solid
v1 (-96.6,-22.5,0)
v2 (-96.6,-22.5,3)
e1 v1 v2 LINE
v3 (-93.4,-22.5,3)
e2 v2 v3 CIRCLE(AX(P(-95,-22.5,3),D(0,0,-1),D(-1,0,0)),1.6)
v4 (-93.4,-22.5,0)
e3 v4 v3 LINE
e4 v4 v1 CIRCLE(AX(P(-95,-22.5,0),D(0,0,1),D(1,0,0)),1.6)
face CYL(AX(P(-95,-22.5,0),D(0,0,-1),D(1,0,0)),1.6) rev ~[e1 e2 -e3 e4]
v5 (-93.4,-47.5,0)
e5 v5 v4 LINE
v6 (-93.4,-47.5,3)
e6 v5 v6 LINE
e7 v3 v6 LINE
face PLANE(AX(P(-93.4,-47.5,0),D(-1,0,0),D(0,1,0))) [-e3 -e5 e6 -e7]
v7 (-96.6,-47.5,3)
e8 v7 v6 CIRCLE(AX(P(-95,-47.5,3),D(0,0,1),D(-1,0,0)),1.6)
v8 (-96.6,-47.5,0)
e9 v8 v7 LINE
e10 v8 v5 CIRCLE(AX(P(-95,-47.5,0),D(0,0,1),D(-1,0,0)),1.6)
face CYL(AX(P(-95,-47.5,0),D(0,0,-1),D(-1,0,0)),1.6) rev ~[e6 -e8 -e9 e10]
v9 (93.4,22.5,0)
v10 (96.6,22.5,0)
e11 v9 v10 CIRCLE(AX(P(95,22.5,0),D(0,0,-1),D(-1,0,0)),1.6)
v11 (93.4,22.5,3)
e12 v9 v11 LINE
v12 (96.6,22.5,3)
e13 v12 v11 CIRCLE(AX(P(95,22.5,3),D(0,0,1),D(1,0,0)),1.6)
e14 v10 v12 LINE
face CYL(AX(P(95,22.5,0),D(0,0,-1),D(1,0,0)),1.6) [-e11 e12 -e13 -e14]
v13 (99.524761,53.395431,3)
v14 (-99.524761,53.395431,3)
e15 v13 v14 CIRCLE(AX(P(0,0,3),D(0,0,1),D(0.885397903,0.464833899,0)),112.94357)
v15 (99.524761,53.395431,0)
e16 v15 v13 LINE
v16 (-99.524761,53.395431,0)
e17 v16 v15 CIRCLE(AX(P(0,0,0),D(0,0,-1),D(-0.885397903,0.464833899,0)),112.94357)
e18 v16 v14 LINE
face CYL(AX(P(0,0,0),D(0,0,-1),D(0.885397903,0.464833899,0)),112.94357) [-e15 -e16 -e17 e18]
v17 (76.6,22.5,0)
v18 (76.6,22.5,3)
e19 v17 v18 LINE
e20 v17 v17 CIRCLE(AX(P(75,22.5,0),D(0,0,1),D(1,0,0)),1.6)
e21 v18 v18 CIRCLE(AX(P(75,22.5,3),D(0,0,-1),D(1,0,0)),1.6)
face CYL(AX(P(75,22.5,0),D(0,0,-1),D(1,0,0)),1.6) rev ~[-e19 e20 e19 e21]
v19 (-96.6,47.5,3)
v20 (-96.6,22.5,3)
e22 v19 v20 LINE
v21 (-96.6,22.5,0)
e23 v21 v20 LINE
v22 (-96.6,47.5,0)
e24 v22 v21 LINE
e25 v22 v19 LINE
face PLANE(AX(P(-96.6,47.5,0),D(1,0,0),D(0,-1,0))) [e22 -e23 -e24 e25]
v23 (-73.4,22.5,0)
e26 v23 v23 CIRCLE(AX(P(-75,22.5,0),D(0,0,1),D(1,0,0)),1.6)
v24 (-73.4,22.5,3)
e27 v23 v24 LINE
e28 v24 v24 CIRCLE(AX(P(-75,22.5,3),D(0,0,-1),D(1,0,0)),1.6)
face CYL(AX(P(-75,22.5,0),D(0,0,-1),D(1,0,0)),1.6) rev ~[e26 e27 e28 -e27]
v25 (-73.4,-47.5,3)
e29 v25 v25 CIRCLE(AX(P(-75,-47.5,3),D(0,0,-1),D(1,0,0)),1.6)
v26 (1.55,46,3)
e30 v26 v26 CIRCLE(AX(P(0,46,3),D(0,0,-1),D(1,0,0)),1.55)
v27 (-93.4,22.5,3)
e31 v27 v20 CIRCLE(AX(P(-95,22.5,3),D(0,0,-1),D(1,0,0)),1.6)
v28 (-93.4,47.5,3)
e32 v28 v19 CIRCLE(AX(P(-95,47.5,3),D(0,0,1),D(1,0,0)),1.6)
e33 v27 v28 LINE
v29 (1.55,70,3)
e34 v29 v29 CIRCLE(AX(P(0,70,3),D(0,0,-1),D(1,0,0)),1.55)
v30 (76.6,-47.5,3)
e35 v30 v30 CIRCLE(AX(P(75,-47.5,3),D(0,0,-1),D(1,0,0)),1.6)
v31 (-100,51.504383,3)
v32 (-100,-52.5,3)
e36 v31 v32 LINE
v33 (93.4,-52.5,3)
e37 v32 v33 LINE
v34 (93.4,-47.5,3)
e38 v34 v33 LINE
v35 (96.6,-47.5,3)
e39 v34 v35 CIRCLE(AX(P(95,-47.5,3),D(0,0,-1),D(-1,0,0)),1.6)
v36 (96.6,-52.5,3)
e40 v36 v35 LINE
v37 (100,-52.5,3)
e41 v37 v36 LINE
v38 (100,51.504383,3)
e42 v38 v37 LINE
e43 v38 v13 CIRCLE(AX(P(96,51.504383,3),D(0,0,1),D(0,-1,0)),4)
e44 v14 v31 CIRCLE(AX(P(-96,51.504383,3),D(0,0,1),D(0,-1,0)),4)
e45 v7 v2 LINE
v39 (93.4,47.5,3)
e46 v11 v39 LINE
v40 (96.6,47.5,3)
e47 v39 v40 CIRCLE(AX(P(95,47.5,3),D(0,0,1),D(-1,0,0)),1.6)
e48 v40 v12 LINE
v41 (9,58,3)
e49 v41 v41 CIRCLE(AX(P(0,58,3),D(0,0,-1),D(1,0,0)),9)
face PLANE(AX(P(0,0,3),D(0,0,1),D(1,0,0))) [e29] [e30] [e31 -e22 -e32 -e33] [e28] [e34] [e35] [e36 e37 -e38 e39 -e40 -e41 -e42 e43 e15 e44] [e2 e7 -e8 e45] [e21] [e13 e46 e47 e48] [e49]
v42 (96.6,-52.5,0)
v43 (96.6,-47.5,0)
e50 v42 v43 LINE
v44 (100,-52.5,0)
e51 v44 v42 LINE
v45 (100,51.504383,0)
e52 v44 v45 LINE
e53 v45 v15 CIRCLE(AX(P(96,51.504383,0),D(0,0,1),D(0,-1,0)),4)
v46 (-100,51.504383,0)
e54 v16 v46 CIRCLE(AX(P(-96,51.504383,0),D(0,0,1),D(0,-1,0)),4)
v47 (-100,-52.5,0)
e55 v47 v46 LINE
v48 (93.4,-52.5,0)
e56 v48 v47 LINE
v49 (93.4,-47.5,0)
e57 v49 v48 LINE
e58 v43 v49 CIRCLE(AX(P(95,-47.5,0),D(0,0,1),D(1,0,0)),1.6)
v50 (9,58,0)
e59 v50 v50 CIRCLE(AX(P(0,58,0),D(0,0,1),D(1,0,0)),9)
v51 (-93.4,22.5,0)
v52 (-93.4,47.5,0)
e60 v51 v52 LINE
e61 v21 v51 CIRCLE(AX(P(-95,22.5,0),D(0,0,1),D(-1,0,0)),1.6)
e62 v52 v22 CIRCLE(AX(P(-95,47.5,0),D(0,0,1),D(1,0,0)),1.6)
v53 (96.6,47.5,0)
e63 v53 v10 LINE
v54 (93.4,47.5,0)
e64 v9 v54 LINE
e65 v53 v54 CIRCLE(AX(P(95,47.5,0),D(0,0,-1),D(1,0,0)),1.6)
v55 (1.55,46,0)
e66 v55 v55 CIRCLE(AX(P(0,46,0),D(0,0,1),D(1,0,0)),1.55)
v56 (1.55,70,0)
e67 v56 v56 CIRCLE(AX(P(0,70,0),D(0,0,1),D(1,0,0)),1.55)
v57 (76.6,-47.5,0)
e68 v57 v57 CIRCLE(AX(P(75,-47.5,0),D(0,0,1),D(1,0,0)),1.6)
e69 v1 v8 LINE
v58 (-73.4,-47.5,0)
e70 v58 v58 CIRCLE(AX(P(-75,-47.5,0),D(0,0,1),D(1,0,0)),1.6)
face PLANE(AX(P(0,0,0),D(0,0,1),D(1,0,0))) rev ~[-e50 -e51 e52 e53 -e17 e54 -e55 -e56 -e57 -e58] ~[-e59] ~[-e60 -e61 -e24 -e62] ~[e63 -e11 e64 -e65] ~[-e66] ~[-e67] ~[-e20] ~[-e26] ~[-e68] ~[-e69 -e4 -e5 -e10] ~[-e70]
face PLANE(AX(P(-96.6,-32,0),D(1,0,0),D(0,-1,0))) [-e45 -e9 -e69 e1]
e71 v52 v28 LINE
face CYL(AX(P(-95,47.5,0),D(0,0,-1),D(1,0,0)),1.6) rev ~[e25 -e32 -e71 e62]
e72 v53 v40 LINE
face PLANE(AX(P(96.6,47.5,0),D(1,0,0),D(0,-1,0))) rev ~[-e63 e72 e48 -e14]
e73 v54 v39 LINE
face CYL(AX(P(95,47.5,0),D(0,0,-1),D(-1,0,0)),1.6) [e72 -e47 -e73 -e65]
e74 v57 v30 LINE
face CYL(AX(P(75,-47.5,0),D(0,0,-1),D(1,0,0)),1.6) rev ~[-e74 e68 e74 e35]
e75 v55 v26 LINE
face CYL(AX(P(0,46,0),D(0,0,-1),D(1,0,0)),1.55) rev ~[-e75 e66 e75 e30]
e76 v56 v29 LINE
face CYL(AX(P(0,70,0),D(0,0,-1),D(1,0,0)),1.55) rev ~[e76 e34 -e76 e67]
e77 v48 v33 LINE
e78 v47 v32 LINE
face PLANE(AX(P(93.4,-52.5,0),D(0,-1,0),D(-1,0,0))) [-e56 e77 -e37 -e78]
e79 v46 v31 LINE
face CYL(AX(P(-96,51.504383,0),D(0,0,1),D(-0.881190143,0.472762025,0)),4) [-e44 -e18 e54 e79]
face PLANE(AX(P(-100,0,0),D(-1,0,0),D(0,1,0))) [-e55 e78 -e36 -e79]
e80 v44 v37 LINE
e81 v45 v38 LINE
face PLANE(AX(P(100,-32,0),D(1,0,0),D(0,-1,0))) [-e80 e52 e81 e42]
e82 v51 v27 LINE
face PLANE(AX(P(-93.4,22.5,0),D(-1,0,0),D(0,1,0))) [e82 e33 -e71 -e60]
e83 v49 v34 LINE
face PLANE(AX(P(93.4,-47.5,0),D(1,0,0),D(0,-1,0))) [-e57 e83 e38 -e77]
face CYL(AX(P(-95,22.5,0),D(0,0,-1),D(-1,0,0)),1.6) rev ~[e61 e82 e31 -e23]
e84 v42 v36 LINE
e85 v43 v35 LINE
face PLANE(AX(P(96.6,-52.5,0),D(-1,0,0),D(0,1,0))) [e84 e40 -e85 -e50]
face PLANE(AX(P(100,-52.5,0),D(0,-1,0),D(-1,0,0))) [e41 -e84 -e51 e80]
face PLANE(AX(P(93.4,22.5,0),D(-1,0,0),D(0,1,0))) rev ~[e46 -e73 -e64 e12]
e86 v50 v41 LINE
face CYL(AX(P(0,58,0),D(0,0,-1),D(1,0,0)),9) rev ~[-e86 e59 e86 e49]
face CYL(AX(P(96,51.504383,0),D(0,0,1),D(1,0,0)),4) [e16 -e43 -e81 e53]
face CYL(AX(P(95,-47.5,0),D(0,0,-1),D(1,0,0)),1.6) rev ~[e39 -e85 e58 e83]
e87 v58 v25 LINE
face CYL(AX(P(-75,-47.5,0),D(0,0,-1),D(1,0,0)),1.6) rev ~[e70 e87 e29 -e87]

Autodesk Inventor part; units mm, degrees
ref_plane "YZ Plane" through (0, 0, 0) normal (1, 0, 0) x (0, 1, 0)
ref_plane "XZ Plane" through (0, 0, 0) normal (0, 1, 0) x (-1, 0, 0)
ref_plane "XY Plane" through (0, 0, 0) normal (0, 0, 1) x (1, 0, 0)
sketch "スケッチ1" plane through (0, 0, 0) normal (0, 0, 1) x (1, 0, 0)
  point P0 (0, 0)
sketch "スケッチ2" plane through (0, 0, 0) normal (0, 0, 1) x (1, 0, 0)
  line L0 (100, -52.5) -> (-100, -52.5)
  line L1 (-100, -52.5) -> (-100, 52.5)
  line L2 (-100, 52.5) -> (100, 52.5)
  line L3 (100, 52.5) -> (100, -52.5)
  line L4 (100, -52.5) -> (-100, 52.5) construction
  line L5 (-100, -52.5) -> (100, 52.5) construction
  circle A0 centre (-48, -32) radius 6.05
  circle A1 centre (48, -32) radius 12.55
  circle A2 centre (48, -32) radius 17.5
  circle A3 centre (65.5, -32) radius 2.05
  circle A4 centre (48, -14.5) radius 2.05
  circle A5 centre (30.5, -32) radius 2.05
  circle A6 centre (48, -49.5) radius 2.05
  circle A7 centre (-48, -32) radius 9
  circle A8 centre (-57, -32) radius 1.6
  circle A9 centre (-48, -41) radius 1.6
  circle A10 centre (-39, -32) radius 1.6
  circle A11 centre (-48, -23) radius 1.6
  line L6 (95, 47.5) -> (-95, 47.5)
  line L7 (-95, 47.5) -> (-95, -47.5)
  line L8 (-95, -47.5) -> (95, -47.5)
  line L9 (95, -47.5) -> (95, 47.5)
  line L10 (-95, 47.5) -> (-95, 22.5) construction
  line L11 (-96.6, 47.5) -> (-96.6, 22.5)
  line L12 (-93.4, 22.5) -> (-93.4, 47.5)
  arc A12 (-93.4, 47.5) -> (-96.6, 47.5) centre (-95, 47.5) ccw
  arc A13 (-96.6, 22.5) -> (-93.4, 22.5) centre (-95, 22.5) ccw
  line L13 (-95, 47.5) -> (-70, 47.5) construction
  line L14 (-95, -47.5) -> (-95, -22.5) construction
  line L15 (-93.4, -47.5) -> (-93.4, -22.5)
  line L16 (-96.6, -22.5) -> (-96.6, -47.5)
  arc A14 (-96.6, -47.5) -> (-93.4, -47.5) centre (-95, -47.5) ccw
  arc A15 (-93.4, -22.5) -> (-96.6, -22.5) centre (-95, -22.5) ccw
  line L17 (-95, -47.5) -> (-70, -47.5) construction
  line L18 (95, 47.5) -> (95, 22.5) construction
  line L19 (96.6, 47.5) -> (96.6, 22.5)
  line L20 (93.4, 22.5) -> (93.4, 47.5)
  arc A16 (93.4, 47.5) -> (96.6, 47.5) centre (95, 47.5) ccw
  arc A17 (96.6, 22.5) -> (93.4, 22.5) centre (95, 22.5) ccw
  line L21 (95, 47.5) -> (120, 47.5) construction
  line L22 (95, -47.5) -> (95, -72.5) construction
  line L23 (93.4, -47.5) -> (93.4, -72.5)
  line L24 (96.6, -72.5) -> (96.6, -47.5)
  arc A18 (96.6, -47.5) -> (93.4, -47.5) centre (95, -47.5) ccw
  arc A19 (93.4, -72.5) -> (96.6, -72.5) centre (95, -72.5) ccw
  line L25 (95, -47.5) -> (120, -47.5) construction
  line L26 (-100, -32) -> (100, -32)
  circle A20 centre (0, -32) radius 9
  circle A21 centre (0, -32) radius 39
  line L27 (-85, 52.5) -> (85, 52.5)
  line L28 (85, 52.5) -> (85, 47.5)
  line L29 (85, 47.5) -> (-85, 47.5)
  line L30 (-85, 47.5) -> (-85, 52.5)
  line L31 (-85, 47.5) -> (0, 0)
  line L32 (0, 0) -> (85, 47.5)
  line L33 (-100, 0) -> (100, 0)
  line L34 (100, 0) -> (100, -62.5)
  line L35 (100, -62.5) -> (-100, -62.5)
  line L36 (-100, -62.5) -> (-100, 0)
  arc A22 (100, 52.5) -> (-100, 52.5) centre (0, 0) ccw
  circle A23 centre (0, 58) radius 12
  line L37 (0, 112.9436) -> (0, -32)
  circle A24 centre (0, 58) radius 9
  circle A25 centre (0, 70) radius 1.55
  circle A26 centre (0, 46) radius 1.55
  line L38 (75, -47.5) -> (-75, -47.5)
  line L39 (-75, -47.5) -> (-75, 22.5)
  line L40 (-75, 22.5) -> (75, 22.5)
  line L41 (75, 22.5) -> (75, -47.5)
  line L42 (75, -47.5) -> (-75, 22.5) construction
  line L43 (-75, -47.5) -> (75, 22.5) construction
  circle A27 centre (-75, 22.5) radius 1.6
  circle A28 centre (75, 22.5) radius 1.6
  circle A29 centre (75, -47.5) radius 1.6
  circle A30 centre (-75, -47.5) radius 1.6
  point P0 (-95, 35)
  point P1 (-95, -35)
  point P2 (95, 35)
  point P3 (95, -60)
  point P4 (-39.1422, -33.5937)
  point P5 (-39.1422, -30.4063)
  point P6 (0, 52.5)
  point P7 (85, 52.5)
  point P8 (48.45, -47.5)
  point P9 (47.55, -47.5)
  point P10 (100, -52.5)
  point P11 (0, -12.5)
  dimension "d9" = 35
  dimension "d15" = 18
  dimension "d0" = 200
  dimension "d1" = 105
  dimension "d5" = 12.1
  dimension "d6" = 25.1
  dimension "d10" = 4.1
  dimension "d13" = 360
  dimension "d16" = 3.2
  dimension "d19" = 360
  dimension "d21" = 5
  dimension "d22" = 25
  dimension "d23" = 90
  dimension "d24" = 3.2
  dimension "d25" = 25
  dimension "d26" = 90
  dimension "d27" = 3.2
  dimension "d28" = 25
  dimension "d29" = 90
  dimension "d30" = 3.2
  dimension "d31" = 25
  dimension "d32" = 90
  dimension "d33" = 3.2
  dimension "d36" = 20.5
  dimension "d37" = 18
  dimension "d38" = 78
  dimension "d39" = 48
  dimension "d40" = 48
  dimension "d43" = 170
  dimension "d44" = 85
  dimension "d46" = 62.5
  dimension "d47" = 24
  dimension "d48" = 90
  dimension "d49" = 18
  dimension "d50" = 3.1
  dimension "d51" = 3.1
  dimension "d52" = 150
  dimension "d53" = 70
  dimension "d54" = 3.2
  dimension "d55" = 3.2
  dimension "d56" = 3.2
  dimension "d57" = 3.2
  dimension "d62" = 105.5
extrude "押し出し1" add sketch "スケッチ2" along normal blind 3 contours L0 L24 A18 L9 L26 L3 | L26 L9 L33 L3 | L0 A21 L8 A2 A6 A29 L23 | L33 L9 A17 L19 A16 L6 L28 L2 L3 | L26 L41 L33 L9 | L9 A18 L8 A29 L41 L26 | L0 A21 L8 | L2 A23 A25 L37 A22 | L33 L41 A28 L40 L32 L6 L20 A17 L9 | L41 A29 L8 A2 A3 L26 | L26 A3 A2 A4 A21 L33 L41 | L0 L1 L26 L16 A14 L8 A30 A21 | A21 A2 L8 | L8 A21 A10 L26 A20 A5 A2 | L28 L6 A23 L2 | L37 A25 A23 L2 A22 | L33 A21 L32 L40 A28 L41 | L26 A2 A3 | A3 A2 L26 | L8 A30 L39 L26 A8 A7 A9 A10 A21 | L8 A6 A2 | A2 A21 A1 L26 A3 L8 A6 | A2 A5 L26 A1 A21 | A23 L6 A26 L37 A24 L2 | L2 A24 L37 A25 A23 | L32 L40 L37 A26 A23 L6 | L2 L30 L6 A12 L11 A13 L7 L33 L1 | A16 L6 L9 | L33 L32 A21 | A21 A2 A5 L26 A20 L37 L33 | A3 L26 A1 A21 A2 A4 | A2 L26 A3 | A3 L26 A2 | L1 L33 L7 A15 L16 L26 | A21 L26 A10 | A10 A7 A21 | A6 L8 A2 | A2 A6 | A6 L8 | A5 L26 A2 | A2 L26 A5 | A21 L26 A1 | A1 L26 A21 | A2 A6 L8 | A23 A26 L6 | L32 A21 L37 L40 | L2 A23 L6 L30 | A25 L37 A24 L2 A23 | A21 A1 L26 A5 A2 | L32 L37 A21 | L33 A21 L31 | L37 A20 L26 A10 A21 L33 | L31 A21 L37 | A4 A2 | A2 A4 | A30 L8 L15 L26 L39 | A10 L26 A7 | A7 A9 A8 L26 A0 A10 | L26 A21 A10 | L26 A10 A7 | A7 A10 A21 | L26 A5 A2 | A2 A5 L26 | A1 A21 L26 | L26 A21 A1 | L37 A26 L6 A23 L2 A24 | L40 L31 L6 A23 A26 L37 | L37 A21 L31 L40 | L33 L39 L26 L15 A15 L7 | L7 A13 L12 L6 L31 L40 A27 L39 L33 | A21 L33 L39 A27 L40 L31 | A21 A10 A7 A11 A8 L26 L39 L33 | L37 L26 A20 | A20 L26 L37 | A9 A7 | A7 A9 | L26 A0 A8 A7 A11 A10 | L26 A20 | L6 A26 A23 | L26 A7 A8 | A8 A7 L26 | L26 A0 | A0 L26 | A11 A7 | A7 A11 | A8 L26 A7 | A7 L26 A8
fillet "フィレット1" radius 4 2 edges at (100, 52.5, 1.5) (-100, 52.5, 1.5)
equation "\"d25\" = d22"
equation "\"d27\" = d24"
equation "\"d28\" = d22"
equation "\"d30\" = d24"
equation "\"d31\" = d22"
equation "\"d33\" = d24"
equation "\"d40\" = d39"
equation "\"d44\" = 0.5 * d43"
properties part number "aaa_small_plate_arm"
